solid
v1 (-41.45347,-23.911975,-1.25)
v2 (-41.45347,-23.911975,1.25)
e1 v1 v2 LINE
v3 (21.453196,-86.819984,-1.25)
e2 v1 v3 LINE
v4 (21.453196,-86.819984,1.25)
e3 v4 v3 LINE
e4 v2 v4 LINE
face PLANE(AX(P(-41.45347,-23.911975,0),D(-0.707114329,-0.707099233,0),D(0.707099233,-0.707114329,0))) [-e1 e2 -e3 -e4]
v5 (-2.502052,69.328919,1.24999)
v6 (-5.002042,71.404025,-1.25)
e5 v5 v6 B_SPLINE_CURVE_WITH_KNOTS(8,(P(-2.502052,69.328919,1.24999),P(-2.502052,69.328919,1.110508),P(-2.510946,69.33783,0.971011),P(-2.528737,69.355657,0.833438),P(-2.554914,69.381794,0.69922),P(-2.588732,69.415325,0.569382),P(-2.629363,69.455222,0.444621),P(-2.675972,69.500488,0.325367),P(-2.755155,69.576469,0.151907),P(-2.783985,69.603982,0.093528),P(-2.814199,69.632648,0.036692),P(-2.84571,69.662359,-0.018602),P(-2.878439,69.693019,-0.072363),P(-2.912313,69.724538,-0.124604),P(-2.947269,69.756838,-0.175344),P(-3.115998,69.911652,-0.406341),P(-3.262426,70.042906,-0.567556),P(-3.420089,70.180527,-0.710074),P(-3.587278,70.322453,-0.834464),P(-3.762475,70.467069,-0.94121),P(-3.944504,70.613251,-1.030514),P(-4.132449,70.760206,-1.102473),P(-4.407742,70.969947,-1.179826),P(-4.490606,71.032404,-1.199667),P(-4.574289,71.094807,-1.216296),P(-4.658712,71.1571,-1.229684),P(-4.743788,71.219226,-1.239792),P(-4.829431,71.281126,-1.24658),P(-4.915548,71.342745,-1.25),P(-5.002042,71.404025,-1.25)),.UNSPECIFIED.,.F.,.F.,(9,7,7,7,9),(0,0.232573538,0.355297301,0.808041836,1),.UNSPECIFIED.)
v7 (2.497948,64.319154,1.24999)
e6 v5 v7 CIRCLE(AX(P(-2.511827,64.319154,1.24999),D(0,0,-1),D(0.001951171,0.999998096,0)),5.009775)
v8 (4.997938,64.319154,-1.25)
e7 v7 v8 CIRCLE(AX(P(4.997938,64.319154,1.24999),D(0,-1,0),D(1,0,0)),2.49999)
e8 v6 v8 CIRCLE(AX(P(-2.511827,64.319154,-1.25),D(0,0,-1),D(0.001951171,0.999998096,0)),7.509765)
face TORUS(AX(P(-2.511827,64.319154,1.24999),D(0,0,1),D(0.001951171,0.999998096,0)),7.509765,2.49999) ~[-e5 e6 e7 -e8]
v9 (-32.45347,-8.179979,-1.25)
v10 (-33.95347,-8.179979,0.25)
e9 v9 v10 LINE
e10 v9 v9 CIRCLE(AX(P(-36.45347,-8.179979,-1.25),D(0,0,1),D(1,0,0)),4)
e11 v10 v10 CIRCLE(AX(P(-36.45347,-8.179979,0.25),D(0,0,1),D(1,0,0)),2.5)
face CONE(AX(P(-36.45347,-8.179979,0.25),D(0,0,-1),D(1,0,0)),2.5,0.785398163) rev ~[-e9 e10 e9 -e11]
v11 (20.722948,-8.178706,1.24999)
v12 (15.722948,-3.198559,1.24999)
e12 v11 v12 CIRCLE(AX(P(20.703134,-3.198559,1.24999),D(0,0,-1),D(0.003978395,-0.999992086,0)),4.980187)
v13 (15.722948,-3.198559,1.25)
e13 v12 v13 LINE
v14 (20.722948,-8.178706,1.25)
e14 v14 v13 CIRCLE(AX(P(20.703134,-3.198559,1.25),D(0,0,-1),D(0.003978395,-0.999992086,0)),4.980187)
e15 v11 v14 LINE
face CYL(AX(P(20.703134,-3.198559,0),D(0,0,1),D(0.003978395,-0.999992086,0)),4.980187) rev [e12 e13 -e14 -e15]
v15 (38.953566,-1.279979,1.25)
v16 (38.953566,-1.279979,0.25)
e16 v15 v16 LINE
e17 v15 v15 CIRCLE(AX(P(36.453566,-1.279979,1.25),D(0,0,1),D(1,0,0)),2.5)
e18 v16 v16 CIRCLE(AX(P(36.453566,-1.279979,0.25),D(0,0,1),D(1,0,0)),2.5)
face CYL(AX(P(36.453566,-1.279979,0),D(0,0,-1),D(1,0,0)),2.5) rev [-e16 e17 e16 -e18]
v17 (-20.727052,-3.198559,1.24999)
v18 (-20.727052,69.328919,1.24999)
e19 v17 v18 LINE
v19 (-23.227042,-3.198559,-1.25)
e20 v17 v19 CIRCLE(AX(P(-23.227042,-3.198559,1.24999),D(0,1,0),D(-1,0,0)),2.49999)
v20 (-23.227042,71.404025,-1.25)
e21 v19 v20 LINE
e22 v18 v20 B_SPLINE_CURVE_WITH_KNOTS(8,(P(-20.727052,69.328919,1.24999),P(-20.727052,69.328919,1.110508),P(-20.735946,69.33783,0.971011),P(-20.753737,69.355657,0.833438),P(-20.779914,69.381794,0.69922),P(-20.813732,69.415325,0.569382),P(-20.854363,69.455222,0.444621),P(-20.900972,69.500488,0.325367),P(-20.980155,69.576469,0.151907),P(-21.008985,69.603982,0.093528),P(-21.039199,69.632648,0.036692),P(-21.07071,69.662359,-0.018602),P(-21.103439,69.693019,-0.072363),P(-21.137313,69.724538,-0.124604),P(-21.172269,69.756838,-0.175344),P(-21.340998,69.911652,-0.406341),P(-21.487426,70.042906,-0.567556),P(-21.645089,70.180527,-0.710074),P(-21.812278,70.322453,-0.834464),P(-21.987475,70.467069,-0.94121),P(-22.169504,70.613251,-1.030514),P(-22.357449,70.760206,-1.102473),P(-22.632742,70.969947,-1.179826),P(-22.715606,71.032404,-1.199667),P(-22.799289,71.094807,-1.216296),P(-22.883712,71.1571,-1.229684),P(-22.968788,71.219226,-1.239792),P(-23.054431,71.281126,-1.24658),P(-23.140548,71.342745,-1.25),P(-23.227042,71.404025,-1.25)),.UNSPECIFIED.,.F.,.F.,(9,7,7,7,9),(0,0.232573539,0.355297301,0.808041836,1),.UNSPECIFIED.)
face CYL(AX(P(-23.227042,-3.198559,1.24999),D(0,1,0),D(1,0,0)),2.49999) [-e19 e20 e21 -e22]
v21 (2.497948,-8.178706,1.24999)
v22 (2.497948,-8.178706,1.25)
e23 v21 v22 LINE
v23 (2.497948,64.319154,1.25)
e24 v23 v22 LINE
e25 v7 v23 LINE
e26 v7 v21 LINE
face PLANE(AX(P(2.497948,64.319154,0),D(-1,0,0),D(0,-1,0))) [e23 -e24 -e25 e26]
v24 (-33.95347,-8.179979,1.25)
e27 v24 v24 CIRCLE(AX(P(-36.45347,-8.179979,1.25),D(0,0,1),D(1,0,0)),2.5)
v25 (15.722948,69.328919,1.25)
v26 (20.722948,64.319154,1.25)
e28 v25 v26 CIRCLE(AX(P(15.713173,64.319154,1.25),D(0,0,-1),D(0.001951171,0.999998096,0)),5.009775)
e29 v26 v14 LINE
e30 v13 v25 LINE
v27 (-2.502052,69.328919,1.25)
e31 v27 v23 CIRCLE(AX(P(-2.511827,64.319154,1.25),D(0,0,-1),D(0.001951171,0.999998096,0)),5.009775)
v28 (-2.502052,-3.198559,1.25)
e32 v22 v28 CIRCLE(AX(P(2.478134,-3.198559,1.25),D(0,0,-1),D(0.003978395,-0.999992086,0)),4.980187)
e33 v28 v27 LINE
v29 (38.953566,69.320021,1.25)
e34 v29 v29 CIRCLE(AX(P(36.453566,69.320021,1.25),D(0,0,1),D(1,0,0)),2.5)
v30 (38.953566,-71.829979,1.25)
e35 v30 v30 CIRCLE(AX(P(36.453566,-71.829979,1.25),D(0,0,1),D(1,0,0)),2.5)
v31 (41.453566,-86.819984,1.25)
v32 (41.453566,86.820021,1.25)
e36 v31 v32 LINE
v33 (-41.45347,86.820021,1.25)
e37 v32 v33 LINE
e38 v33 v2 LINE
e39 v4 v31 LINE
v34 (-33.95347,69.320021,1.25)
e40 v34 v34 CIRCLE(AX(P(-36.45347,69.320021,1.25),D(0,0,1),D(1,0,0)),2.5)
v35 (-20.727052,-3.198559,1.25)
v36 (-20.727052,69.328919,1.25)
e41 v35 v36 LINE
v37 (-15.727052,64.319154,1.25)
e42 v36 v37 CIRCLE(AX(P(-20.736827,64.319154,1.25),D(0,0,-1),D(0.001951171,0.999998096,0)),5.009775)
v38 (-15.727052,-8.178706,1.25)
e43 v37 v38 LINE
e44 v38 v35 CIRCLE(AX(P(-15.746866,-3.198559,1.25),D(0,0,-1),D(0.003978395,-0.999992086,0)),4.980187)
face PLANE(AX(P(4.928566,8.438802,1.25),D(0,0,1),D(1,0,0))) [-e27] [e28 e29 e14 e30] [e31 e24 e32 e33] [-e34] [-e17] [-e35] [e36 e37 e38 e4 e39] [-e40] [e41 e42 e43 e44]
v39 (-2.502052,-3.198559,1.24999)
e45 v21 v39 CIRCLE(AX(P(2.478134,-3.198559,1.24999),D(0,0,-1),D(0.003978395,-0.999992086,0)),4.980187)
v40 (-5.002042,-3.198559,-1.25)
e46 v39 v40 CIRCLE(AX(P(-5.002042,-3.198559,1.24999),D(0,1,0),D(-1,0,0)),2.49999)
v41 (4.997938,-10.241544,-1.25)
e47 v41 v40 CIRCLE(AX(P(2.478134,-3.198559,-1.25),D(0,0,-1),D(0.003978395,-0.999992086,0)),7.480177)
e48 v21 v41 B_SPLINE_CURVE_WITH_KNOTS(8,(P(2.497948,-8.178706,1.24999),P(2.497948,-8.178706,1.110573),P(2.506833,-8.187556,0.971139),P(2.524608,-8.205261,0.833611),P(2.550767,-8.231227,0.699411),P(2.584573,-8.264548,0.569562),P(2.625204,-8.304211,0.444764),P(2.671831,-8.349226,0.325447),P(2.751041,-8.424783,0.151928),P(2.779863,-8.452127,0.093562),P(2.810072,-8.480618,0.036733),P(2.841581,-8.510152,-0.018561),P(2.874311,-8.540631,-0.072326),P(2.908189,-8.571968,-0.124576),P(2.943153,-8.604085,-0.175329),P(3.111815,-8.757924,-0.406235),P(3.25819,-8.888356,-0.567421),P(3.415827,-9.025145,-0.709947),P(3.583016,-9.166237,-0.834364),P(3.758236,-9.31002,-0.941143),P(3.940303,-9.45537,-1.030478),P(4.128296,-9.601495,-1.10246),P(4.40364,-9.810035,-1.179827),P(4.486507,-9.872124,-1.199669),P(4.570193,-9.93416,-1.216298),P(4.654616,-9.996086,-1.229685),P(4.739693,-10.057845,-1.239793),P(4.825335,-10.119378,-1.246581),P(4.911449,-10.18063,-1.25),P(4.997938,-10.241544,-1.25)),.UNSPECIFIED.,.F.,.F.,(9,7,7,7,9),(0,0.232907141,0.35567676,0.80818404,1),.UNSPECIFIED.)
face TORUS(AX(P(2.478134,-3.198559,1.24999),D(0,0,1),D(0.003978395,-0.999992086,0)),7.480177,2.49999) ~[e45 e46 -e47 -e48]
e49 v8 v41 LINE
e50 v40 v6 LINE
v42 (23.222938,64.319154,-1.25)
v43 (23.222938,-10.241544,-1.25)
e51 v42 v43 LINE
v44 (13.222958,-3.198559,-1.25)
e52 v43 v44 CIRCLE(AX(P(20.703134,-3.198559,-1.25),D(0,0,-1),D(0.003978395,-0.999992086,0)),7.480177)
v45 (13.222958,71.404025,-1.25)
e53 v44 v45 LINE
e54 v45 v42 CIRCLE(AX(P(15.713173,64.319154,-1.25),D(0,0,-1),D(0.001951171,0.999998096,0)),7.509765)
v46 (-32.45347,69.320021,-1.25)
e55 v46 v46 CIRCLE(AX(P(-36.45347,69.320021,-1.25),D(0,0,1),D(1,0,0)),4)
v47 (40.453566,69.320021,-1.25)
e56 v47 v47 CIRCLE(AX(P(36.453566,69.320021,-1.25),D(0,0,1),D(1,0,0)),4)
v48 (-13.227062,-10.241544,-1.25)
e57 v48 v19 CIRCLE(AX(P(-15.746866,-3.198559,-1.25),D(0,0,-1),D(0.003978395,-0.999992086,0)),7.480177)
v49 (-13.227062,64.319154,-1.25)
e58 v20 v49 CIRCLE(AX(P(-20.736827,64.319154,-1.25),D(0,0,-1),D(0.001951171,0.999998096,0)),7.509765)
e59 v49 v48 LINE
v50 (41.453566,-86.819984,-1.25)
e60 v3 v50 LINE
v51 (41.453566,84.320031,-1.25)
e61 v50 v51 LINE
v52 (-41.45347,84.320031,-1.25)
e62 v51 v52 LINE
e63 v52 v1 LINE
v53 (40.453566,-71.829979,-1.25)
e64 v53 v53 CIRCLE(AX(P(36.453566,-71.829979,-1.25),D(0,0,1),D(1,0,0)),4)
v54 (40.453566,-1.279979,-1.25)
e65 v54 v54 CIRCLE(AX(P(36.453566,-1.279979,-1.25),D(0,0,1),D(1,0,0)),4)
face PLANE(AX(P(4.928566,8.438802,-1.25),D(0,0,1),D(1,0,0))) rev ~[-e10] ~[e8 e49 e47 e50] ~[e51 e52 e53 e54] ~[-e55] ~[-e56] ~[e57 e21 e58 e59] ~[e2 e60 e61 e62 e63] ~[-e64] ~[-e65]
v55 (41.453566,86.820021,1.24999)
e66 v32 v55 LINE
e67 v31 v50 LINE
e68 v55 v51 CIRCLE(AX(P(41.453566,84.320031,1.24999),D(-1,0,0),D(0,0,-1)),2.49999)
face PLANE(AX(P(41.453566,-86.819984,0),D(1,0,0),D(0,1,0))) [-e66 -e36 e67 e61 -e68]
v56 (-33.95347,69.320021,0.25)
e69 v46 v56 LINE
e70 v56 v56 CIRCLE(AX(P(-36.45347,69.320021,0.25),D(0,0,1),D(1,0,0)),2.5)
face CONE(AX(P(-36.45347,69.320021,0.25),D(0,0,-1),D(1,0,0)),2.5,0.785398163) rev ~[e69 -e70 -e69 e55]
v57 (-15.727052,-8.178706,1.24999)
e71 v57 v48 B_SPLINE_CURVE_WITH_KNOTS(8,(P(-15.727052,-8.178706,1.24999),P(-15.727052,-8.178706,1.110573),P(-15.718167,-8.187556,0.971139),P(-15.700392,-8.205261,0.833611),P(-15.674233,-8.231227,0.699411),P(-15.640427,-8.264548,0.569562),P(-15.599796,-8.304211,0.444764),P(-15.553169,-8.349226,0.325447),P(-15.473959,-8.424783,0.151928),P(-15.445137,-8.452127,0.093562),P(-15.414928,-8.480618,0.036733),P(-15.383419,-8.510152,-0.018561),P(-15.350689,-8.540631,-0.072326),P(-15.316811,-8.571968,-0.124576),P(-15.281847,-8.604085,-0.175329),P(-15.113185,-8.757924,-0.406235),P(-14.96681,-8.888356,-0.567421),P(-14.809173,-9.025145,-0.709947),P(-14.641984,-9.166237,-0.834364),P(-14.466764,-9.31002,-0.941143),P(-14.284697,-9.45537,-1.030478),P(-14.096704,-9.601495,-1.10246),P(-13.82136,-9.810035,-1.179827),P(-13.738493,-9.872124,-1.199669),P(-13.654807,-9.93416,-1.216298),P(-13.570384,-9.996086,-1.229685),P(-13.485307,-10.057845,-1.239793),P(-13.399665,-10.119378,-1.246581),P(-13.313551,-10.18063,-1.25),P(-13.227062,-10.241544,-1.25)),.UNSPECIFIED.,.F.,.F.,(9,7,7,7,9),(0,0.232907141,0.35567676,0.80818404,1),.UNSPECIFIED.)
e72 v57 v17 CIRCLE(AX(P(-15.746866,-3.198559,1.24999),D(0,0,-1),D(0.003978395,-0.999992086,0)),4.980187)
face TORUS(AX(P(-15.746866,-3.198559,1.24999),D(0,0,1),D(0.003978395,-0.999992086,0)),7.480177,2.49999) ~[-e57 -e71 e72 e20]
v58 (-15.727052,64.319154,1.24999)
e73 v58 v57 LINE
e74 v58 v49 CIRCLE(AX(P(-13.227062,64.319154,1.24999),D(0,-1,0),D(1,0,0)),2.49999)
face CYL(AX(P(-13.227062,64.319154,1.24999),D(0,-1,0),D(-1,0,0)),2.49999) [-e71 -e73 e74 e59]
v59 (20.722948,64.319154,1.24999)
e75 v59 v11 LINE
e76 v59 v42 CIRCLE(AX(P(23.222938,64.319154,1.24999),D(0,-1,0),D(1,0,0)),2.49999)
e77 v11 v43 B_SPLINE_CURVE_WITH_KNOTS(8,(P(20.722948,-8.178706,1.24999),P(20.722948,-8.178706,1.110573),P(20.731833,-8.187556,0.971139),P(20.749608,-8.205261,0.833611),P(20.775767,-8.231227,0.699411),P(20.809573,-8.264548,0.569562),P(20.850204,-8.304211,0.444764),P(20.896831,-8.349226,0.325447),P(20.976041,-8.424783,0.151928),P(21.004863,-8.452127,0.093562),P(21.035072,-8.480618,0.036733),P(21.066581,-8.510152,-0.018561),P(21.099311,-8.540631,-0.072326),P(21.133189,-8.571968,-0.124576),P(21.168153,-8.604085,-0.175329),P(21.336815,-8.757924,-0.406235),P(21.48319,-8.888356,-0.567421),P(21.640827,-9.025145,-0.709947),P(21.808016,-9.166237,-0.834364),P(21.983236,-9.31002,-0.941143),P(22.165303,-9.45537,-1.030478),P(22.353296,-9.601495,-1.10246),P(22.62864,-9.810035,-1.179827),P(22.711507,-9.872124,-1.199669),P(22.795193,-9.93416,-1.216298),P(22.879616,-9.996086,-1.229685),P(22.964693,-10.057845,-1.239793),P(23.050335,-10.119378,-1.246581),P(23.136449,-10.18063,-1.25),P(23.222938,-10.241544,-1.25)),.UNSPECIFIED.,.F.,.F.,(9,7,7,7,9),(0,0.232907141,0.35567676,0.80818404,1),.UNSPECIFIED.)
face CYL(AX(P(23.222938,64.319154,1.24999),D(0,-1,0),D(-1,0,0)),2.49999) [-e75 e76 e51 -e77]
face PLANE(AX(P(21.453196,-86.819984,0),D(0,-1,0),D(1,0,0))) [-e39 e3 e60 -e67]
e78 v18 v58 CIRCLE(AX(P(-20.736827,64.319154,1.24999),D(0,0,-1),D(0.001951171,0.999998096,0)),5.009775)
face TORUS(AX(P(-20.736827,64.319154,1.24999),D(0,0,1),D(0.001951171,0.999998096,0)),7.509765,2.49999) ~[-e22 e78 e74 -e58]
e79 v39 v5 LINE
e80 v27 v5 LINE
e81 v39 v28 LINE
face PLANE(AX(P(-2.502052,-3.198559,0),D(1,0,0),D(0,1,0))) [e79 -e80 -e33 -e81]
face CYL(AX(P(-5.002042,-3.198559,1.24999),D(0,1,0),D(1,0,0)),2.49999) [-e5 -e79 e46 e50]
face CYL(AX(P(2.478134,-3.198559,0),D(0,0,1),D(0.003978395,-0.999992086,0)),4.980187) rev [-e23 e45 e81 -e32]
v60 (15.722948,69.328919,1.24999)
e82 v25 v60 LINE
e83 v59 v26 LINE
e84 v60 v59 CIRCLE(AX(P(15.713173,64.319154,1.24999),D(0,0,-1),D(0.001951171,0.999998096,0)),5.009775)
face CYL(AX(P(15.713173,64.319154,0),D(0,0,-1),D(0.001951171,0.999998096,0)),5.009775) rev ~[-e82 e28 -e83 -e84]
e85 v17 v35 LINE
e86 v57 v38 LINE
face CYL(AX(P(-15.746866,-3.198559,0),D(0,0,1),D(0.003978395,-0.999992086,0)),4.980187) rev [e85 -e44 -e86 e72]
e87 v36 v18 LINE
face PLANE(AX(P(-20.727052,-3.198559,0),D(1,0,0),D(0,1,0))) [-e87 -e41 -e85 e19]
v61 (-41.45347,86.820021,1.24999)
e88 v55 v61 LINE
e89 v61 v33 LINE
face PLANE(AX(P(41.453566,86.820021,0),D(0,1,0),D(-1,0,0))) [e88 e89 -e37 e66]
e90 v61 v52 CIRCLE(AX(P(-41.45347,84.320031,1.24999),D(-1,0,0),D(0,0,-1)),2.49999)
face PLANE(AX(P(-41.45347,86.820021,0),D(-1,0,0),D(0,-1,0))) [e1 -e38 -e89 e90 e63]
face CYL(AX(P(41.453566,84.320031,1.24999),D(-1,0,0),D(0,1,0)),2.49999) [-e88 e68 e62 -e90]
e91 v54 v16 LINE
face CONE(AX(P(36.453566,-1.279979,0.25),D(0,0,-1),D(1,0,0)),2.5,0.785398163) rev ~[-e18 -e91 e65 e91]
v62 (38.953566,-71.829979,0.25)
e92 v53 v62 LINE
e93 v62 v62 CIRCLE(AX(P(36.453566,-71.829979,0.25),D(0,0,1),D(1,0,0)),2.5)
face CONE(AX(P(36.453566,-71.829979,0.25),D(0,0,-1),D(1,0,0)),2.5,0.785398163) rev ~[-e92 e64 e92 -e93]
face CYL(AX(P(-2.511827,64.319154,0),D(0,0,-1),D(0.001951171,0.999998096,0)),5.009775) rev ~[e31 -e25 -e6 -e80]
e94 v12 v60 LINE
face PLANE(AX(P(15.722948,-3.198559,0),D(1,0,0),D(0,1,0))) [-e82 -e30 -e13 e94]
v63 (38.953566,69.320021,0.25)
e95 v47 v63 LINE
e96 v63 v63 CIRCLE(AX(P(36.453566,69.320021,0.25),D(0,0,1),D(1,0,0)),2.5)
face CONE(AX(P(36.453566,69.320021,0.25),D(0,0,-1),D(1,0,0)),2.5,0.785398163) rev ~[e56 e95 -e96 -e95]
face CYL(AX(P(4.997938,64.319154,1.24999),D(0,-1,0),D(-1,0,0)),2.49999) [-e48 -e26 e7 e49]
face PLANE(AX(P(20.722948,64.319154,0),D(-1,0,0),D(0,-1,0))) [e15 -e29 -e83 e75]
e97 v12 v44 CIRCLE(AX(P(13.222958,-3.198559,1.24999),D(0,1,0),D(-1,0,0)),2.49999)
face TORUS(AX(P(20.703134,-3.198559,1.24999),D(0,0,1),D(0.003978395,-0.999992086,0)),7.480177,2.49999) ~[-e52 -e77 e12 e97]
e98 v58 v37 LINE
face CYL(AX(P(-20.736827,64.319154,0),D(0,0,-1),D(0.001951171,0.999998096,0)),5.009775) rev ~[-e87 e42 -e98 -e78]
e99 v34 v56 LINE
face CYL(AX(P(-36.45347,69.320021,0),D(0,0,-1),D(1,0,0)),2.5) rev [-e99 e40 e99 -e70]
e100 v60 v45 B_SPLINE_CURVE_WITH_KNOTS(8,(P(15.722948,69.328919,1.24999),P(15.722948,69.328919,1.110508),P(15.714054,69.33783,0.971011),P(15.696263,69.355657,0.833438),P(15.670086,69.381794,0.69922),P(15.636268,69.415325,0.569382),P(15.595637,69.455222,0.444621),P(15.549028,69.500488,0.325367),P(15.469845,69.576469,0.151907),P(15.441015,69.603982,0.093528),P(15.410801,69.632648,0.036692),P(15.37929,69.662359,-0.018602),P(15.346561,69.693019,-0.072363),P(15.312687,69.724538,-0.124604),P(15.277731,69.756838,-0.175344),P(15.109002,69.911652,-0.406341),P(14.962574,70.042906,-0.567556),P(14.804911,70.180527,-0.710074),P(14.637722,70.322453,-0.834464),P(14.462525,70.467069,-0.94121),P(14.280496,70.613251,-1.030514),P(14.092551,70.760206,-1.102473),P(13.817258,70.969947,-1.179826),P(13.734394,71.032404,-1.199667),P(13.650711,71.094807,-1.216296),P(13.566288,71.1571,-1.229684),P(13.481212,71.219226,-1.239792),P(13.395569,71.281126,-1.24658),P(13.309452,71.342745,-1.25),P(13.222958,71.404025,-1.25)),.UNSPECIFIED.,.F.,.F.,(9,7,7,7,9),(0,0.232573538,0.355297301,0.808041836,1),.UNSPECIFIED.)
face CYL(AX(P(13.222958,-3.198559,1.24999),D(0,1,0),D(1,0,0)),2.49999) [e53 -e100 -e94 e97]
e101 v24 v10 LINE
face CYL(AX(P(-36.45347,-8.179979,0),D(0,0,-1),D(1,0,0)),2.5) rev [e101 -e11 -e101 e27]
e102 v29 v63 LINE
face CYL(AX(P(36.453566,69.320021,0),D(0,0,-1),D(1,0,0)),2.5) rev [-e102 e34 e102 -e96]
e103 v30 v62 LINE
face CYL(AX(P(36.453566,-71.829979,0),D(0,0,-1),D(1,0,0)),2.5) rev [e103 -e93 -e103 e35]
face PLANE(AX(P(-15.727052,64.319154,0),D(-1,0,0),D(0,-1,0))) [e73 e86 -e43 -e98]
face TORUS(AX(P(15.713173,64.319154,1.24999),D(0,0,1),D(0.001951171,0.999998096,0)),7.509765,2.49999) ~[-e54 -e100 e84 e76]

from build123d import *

# Parameters (mm, degrees)
F0_R     = 2.5
F1_DEPTH = 1.25
F2_R     = 2.49999
F3_SIZE  = 1.5


# Not quite as in the source:
# - a fillet or chamfer is up to 0.001 mm smaller than in the source, because OpenCascade refuses the exact size


with BuildPart() as f1:
    # F0 (on Top) → F1 (new body, symmetric)
    with BuildSketch(Plane.XY):
        Polygon((41.4535664022, 86.8200212717), (-41.4534695446, 86.8200212717), (-41.4534695446, -23.9119753242), (21.4531961828, -86.8199840188), (41.4535664022, -86.8199840188), align=None)
        with Locations((-36.4534695446, -8.1799787283)):
            Circle(F0_R, mode=Mode.SUBTRACT)
        with Locations((36.4535664022, -71.8299787283)):
            Circle(F0_R, mode=Mode.SUBTRACT)
        with Locations((36.4535664022, -1.2799787283)):
            Circle(F0_R, mode=Mode.SUBTRACT)
        with BuildLine():
            Line((-20.7270524408, -3.1985588427), (-20.7270524408, 69.3289190531))
            ThreePointArc((-20.7270524408, 69.3289190531), (-17.1909272701, 67.8581418384), (-15.7270524408, 64.3191536607))
            Line((-15.7270524408, 64.3191536607), (-15.7270524408, -8.1787062808))
            ThreePointArc((-15.7270524408, -8.1787062808), (-19.2613774966, -6.7270807891), (-20.7270524408, -3.1985588427))
        make_face(mode=Mode.SUBTRACT)
        with BuildLine():
            Line((-2.5020524408, -3.1985588427), (-2.5020524408, 69.3289190531))
            ThreePointArc((-2.5020524408, 69.3289190531), (1.0340727299, 67.8581418384), (2.4979475592, 64.3191536607))
            Line((2.4979475592, 64.3191536607), (2.4979475592, -8.1787062808))
            ThreePointArc((2.4979475592, -8.1787062808), (-1.0363774966, -6.7270807891), (-2.5020524408, -3.1985588427))
        make_face(mode=Mode.SUBTRACT)
        with Locations((-36.4534695446, 69.3200212717)):
            Circle(F0_R, mode=Mode.SUBTRACT)
        with BuildLine():
            Line((15.7229475592, -3.1985588427), (15.7229475592, 69.3289190531))
            ThreePointArc((15.7229475592, 69.3289190531), (19.2590727299, 67.8581418384), (20.7229475592, 64.3191536607))
            Line((20.7229475592, 64.3191536607), (20.7229475592, -8.1787062808))
            ThreePointArc((20.7229475592, -8.1787062808), (17.1886225034, -6.7270807891), (15.7229475592, -3.1985588427))
        make_face(mode=Mode.SUBTRACT)
        with Locations((36.4535664022, 69.3200212717)):
            Circle(F0_R, mode=Mode.SUBTRACT)
    extrude(amount=F1_DEPTH, both=True)

    # F2 (radius 2.5 in the source; OpenCascade refuses exactly that, so slightly less here)
    f2_edges = [f1.edges().sort_by_distance(p)[0] for p in [
        (4.8e-05, 86.820021, -1.25),
        (-2.502052, 33.06518, -1.25),
        (2.497948, 28.070224, -1.25),
        (-20.727052, 33.06518, -1.25),
        (-15.727052, 28.070224, -1.25),
        (15.722948, 33.06518, -1.25),
        (20.722948, 28.070224, -1.25),
    ]]
    fillet(f2_edges, radius=F2_R)

    # F3
    f3_edges = [f1.edges().sort_by_distance(p)[0] for p in [
        (-38.95347, 69.320021, -1.25),
        (33.953566, 69.320021, -1.25),
        (33.953566, -1.279979, -1.25),
        (-38.95347, -8.179979, -1.25),
        (33.953566, -71.829979, -1.25),
    ]]
    chamfer(f3_edges, length=F3_SIZE)


solid = f1.part
